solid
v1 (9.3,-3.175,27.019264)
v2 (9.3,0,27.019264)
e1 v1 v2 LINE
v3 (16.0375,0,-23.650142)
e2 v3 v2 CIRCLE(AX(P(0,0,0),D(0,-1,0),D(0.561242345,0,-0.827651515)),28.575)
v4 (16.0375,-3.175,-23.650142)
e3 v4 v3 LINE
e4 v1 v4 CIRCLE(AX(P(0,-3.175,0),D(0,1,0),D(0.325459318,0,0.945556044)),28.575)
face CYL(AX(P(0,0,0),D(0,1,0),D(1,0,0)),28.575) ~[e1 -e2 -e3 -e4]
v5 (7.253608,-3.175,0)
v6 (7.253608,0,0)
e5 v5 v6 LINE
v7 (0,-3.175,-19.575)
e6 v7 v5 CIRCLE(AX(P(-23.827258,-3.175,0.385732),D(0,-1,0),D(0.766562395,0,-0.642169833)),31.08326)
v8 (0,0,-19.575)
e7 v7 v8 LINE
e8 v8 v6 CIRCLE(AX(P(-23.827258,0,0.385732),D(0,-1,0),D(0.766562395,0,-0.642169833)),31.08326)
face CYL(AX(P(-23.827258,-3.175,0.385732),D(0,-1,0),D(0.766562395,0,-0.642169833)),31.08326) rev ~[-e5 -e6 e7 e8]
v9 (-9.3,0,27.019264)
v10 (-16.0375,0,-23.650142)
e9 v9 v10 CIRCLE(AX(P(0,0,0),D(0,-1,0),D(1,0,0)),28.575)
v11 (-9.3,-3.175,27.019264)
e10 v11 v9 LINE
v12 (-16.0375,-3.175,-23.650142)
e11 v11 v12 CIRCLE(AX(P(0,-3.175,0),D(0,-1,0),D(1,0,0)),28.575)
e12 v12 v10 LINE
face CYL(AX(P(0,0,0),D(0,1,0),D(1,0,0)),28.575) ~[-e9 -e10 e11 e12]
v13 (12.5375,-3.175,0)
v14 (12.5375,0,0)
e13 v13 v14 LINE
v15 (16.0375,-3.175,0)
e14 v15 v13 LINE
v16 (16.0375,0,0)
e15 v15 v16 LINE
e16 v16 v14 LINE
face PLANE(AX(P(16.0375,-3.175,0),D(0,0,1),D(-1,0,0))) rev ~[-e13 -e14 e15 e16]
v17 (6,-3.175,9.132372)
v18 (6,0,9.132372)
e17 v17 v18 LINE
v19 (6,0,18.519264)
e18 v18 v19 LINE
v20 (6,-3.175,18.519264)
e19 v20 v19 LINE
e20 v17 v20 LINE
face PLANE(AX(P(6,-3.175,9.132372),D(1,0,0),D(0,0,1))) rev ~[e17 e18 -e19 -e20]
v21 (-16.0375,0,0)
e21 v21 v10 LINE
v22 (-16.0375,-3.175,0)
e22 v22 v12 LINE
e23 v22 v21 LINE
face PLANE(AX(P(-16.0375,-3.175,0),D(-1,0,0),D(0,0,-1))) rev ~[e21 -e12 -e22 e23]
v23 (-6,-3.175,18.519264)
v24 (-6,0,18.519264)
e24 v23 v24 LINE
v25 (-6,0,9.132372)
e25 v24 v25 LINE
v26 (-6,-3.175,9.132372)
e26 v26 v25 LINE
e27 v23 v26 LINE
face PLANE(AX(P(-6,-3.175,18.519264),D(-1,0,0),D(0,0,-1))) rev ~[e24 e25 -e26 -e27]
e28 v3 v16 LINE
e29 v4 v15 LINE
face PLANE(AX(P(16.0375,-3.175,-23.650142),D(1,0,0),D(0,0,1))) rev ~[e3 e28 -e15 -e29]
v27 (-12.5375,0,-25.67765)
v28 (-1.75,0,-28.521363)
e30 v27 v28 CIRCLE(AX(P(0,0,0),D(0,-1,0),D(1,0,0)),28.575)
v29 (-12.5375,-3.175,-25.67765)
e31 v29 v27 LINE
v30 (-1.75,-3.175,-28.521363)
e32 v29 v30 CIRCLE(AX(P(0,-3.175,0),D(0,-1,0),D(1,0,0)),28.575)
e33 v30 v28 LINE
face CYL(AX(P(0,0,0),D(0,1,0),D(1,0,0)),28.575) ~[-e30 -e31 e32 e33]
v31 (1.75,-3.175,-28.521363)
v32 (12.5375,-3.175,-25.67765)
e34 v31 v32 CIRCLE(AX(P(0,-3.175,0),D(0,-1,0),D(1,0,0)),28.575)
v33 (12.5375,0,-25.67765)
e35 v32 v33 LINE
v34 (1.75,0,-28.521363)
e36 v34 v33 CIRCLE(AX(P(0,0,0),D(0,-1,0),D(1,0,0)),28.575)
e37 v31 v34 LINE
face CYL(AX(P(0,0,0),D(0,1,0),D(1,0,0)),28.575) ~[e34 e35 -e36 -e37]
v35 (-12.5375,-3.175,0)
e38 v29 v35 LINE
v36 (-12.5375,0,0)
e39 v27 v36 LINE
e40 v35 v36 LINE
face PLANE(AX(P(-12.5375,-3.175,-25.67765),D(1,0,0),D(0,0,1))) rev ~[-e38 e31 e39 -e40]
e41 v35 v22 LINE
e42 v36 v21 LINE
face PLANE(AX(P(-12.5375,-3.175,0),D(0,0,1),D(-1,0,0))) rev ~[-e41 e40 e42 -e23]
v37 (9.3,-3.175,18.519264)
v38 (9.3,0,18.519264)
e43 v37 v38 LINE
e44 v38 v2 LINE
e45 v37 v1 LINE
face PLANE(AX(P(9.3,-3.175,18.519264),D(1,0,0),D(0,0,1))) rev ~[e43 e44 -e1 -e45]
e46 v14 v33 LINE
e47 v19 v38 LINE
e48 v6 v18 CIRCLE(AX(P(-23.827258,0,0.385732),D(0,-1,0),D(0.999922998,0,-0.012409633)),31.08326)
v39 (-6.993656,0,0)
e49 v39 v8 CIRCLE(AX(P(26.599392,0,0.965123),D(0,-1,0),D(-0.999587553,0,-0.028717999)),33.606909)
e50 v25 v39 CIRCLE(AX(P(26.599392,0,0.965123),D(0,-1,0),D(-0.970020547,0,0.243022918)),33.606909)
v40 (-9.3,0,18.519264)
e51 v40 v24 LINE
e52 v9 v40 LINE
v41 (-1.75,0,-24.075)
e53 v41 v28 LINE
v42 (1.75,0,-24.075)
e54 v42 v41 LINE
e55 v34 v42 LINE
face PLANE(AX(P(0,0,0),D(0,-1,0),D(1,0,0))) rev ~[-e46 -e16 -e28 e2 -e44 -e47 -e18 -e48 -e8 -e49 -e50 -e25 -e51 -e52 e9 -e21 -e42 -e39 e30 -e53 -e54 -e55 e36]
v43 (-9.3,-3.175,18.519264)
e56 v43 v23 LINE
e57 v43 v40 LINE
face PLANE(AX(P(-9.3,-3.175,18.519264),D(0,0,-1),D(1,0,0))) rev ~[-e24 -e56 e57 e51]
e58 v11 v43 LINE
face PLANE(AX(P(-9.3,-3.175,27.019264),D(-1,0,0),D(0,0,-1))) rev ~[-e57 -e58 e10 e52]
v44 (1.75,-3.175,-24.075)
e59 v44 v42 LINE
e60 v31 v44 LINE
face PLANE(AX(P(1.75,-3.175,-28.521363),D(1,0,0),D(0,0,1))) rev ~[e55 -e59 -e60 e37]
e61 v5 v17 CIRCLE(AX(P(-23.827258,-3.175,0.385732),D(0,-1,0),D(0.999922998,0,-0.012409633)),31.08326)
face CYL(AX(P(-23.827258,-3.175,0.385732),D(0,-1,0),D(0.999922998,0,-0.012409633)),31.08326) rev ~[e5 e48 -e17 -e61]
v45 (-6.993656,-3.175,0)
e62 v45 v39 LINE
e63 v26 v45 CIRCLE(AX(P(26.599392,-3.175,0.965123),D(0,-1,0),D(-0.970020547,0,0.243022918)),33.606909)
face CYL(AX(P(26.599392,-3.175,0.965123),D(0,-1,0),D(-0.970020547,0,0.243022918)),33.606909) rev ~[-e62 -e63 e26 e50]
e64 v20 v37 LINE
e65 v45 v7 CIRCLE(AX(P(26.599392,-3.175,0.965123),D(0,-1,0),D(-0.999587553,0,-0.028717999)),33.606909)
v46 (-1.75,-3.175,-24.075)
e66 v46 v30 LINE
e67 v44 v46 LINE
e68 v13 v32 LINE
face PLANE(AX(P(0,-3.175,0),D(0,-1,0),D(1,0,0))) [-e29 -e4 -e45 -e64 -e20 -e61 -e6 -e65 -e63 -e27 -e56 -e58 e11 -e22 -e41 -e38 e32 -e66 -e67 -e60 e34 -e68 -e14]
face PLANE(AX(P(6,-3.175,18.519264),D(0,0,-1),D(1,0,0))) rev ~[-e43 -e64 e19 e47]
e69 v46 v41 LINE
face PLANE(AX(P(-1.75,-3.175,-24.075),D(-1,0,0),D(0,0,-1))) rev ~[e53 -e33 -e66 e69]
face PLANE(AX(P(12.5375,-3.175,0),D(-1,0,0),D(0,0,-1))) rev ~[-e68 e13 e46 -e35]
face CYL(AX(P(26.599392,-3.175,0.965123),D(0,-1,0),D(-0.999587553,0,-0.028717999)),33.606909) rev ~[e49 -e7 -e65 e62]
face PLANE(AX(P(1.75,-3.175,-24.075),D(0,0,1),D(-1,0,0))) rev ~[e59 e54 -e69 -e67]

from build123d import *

# Parameters (mm, degrees)
F0_R     = 28.575
F1_DEPTH = 3.175
F3_DEPTH = 3.176


# Not quite as in the source:
# - a length typed as a fraction of an inch, garbled in the dataset ("3 / 203.2 mm" for 3/8 in), is restored


with BuildPart() as f1:
    # F0 (on Front) → F1 (new body)
    with BuildSketch(Plane.XZ):
        Circle(F0_R)
    extrude(amount=F1_DEPTH)

    # F2 (on face) → F3 (cut, through all)
    with BuildSketch(Plane.XZ.offset(3.175)):
        with BuildLine():
            Line((7.2536082684, 0), (0, 0))
            Line((0, 0), (0, -19.575))
            ThreePointArc((0, -19.575), (5.3192801015, -10.4146549257), (7.2536082684, 0))
        make_face()
        with BuildLine():
            Line((0, -19.575), (0, 0))
            Line((0, 0), (-6.9936556862, 0))
            ThreePointArc((-6.9936556862, 0), (-5.0483188999, -10.341808774), (0, -19.575))
        make_face()
        with BuildLine():
            ThreePointArc((-6, 9.1323722154), (-6.8103344804, 4.6002974695), (-6.9936556862, 0))
            Line((-6.9936556862, 0), (0, 0))
            Line((0, 0), (7.2536082684, 0))
            ThreePointArc((7.2536082684, 0), (6.9672213091, 4.6129154541), (6, 9.1323722154))
            Line((6, 9.1323722154), (6, 18.5192639611))
            Line((6, 18.5192639611), (9.3, 18.5192639611))
            Line((9.3, 18.5192639611), (9.3, 27.0192639611))
            ThreePointArc((9.3, 27.0192639611), (0, 28.575), (-9.3, 27.0192639611))
            Line((-9.3, 27.0192639611), (-9.3, 18.5192639611))
            Line((-9.3, 18.5192639611), (-6, 18.5192639611))
            Line((-6, 18.5192639611), (-6, 9.1323722154))
        make_face()
        with BuildLine():
            ThreePointArc((-16.0375, -23.650142045), (-14.3234197578, -24.7259028438), (-12.5375, -25.6776501797))
            Line((-12.5375, -25.6776501797), (-12.5375, 0))
            Line((-12.5375, 0), (-16.0375, 0))
            Line((-16.0375, 0), (-16.0375, -23.650142045))
        make_face()
        with BuildLine():
            Line((-1.75, -24.075), (-1.75, -28.5213626077))
            ThreePointArc((-1.75, -28.5213626077), (-0.8754108992, -28.5615875042), (0, -28.575))
            Line((0, -28.575), (0, -24.075))
            Line((0, -24.075), (-1.75, -24.075))
        make_face()
        with BuildLine():
            Line((0, -24.075), (0, -28.575))
            ThreePointArc((0, -28.575), (0.8754108992, -28.5615875042), (1.75, -28.5213626077))
            Line((1.75, -28.5213626077), (1.75, -24.075))
            Line((1.75, -24.075), (0, -24.075))
        make_face()
        with BuildLine():
            Line((12.5375, 0), (12.5375, -25.6776501797))
            ThreePointArc((12.5375, -25.6776501797), (14.3234197578, -24.7259028438), (16.0375, -23.650142045))
            Line((16.0375, -23.650142045), (16.0375, 0))
            Line((16.0375, 0), (12.5375, 0))
        make_face()
    extrude(amount=-F3_DEPTH, mode=Mode.SUBTRACT)


solid = f1.part
